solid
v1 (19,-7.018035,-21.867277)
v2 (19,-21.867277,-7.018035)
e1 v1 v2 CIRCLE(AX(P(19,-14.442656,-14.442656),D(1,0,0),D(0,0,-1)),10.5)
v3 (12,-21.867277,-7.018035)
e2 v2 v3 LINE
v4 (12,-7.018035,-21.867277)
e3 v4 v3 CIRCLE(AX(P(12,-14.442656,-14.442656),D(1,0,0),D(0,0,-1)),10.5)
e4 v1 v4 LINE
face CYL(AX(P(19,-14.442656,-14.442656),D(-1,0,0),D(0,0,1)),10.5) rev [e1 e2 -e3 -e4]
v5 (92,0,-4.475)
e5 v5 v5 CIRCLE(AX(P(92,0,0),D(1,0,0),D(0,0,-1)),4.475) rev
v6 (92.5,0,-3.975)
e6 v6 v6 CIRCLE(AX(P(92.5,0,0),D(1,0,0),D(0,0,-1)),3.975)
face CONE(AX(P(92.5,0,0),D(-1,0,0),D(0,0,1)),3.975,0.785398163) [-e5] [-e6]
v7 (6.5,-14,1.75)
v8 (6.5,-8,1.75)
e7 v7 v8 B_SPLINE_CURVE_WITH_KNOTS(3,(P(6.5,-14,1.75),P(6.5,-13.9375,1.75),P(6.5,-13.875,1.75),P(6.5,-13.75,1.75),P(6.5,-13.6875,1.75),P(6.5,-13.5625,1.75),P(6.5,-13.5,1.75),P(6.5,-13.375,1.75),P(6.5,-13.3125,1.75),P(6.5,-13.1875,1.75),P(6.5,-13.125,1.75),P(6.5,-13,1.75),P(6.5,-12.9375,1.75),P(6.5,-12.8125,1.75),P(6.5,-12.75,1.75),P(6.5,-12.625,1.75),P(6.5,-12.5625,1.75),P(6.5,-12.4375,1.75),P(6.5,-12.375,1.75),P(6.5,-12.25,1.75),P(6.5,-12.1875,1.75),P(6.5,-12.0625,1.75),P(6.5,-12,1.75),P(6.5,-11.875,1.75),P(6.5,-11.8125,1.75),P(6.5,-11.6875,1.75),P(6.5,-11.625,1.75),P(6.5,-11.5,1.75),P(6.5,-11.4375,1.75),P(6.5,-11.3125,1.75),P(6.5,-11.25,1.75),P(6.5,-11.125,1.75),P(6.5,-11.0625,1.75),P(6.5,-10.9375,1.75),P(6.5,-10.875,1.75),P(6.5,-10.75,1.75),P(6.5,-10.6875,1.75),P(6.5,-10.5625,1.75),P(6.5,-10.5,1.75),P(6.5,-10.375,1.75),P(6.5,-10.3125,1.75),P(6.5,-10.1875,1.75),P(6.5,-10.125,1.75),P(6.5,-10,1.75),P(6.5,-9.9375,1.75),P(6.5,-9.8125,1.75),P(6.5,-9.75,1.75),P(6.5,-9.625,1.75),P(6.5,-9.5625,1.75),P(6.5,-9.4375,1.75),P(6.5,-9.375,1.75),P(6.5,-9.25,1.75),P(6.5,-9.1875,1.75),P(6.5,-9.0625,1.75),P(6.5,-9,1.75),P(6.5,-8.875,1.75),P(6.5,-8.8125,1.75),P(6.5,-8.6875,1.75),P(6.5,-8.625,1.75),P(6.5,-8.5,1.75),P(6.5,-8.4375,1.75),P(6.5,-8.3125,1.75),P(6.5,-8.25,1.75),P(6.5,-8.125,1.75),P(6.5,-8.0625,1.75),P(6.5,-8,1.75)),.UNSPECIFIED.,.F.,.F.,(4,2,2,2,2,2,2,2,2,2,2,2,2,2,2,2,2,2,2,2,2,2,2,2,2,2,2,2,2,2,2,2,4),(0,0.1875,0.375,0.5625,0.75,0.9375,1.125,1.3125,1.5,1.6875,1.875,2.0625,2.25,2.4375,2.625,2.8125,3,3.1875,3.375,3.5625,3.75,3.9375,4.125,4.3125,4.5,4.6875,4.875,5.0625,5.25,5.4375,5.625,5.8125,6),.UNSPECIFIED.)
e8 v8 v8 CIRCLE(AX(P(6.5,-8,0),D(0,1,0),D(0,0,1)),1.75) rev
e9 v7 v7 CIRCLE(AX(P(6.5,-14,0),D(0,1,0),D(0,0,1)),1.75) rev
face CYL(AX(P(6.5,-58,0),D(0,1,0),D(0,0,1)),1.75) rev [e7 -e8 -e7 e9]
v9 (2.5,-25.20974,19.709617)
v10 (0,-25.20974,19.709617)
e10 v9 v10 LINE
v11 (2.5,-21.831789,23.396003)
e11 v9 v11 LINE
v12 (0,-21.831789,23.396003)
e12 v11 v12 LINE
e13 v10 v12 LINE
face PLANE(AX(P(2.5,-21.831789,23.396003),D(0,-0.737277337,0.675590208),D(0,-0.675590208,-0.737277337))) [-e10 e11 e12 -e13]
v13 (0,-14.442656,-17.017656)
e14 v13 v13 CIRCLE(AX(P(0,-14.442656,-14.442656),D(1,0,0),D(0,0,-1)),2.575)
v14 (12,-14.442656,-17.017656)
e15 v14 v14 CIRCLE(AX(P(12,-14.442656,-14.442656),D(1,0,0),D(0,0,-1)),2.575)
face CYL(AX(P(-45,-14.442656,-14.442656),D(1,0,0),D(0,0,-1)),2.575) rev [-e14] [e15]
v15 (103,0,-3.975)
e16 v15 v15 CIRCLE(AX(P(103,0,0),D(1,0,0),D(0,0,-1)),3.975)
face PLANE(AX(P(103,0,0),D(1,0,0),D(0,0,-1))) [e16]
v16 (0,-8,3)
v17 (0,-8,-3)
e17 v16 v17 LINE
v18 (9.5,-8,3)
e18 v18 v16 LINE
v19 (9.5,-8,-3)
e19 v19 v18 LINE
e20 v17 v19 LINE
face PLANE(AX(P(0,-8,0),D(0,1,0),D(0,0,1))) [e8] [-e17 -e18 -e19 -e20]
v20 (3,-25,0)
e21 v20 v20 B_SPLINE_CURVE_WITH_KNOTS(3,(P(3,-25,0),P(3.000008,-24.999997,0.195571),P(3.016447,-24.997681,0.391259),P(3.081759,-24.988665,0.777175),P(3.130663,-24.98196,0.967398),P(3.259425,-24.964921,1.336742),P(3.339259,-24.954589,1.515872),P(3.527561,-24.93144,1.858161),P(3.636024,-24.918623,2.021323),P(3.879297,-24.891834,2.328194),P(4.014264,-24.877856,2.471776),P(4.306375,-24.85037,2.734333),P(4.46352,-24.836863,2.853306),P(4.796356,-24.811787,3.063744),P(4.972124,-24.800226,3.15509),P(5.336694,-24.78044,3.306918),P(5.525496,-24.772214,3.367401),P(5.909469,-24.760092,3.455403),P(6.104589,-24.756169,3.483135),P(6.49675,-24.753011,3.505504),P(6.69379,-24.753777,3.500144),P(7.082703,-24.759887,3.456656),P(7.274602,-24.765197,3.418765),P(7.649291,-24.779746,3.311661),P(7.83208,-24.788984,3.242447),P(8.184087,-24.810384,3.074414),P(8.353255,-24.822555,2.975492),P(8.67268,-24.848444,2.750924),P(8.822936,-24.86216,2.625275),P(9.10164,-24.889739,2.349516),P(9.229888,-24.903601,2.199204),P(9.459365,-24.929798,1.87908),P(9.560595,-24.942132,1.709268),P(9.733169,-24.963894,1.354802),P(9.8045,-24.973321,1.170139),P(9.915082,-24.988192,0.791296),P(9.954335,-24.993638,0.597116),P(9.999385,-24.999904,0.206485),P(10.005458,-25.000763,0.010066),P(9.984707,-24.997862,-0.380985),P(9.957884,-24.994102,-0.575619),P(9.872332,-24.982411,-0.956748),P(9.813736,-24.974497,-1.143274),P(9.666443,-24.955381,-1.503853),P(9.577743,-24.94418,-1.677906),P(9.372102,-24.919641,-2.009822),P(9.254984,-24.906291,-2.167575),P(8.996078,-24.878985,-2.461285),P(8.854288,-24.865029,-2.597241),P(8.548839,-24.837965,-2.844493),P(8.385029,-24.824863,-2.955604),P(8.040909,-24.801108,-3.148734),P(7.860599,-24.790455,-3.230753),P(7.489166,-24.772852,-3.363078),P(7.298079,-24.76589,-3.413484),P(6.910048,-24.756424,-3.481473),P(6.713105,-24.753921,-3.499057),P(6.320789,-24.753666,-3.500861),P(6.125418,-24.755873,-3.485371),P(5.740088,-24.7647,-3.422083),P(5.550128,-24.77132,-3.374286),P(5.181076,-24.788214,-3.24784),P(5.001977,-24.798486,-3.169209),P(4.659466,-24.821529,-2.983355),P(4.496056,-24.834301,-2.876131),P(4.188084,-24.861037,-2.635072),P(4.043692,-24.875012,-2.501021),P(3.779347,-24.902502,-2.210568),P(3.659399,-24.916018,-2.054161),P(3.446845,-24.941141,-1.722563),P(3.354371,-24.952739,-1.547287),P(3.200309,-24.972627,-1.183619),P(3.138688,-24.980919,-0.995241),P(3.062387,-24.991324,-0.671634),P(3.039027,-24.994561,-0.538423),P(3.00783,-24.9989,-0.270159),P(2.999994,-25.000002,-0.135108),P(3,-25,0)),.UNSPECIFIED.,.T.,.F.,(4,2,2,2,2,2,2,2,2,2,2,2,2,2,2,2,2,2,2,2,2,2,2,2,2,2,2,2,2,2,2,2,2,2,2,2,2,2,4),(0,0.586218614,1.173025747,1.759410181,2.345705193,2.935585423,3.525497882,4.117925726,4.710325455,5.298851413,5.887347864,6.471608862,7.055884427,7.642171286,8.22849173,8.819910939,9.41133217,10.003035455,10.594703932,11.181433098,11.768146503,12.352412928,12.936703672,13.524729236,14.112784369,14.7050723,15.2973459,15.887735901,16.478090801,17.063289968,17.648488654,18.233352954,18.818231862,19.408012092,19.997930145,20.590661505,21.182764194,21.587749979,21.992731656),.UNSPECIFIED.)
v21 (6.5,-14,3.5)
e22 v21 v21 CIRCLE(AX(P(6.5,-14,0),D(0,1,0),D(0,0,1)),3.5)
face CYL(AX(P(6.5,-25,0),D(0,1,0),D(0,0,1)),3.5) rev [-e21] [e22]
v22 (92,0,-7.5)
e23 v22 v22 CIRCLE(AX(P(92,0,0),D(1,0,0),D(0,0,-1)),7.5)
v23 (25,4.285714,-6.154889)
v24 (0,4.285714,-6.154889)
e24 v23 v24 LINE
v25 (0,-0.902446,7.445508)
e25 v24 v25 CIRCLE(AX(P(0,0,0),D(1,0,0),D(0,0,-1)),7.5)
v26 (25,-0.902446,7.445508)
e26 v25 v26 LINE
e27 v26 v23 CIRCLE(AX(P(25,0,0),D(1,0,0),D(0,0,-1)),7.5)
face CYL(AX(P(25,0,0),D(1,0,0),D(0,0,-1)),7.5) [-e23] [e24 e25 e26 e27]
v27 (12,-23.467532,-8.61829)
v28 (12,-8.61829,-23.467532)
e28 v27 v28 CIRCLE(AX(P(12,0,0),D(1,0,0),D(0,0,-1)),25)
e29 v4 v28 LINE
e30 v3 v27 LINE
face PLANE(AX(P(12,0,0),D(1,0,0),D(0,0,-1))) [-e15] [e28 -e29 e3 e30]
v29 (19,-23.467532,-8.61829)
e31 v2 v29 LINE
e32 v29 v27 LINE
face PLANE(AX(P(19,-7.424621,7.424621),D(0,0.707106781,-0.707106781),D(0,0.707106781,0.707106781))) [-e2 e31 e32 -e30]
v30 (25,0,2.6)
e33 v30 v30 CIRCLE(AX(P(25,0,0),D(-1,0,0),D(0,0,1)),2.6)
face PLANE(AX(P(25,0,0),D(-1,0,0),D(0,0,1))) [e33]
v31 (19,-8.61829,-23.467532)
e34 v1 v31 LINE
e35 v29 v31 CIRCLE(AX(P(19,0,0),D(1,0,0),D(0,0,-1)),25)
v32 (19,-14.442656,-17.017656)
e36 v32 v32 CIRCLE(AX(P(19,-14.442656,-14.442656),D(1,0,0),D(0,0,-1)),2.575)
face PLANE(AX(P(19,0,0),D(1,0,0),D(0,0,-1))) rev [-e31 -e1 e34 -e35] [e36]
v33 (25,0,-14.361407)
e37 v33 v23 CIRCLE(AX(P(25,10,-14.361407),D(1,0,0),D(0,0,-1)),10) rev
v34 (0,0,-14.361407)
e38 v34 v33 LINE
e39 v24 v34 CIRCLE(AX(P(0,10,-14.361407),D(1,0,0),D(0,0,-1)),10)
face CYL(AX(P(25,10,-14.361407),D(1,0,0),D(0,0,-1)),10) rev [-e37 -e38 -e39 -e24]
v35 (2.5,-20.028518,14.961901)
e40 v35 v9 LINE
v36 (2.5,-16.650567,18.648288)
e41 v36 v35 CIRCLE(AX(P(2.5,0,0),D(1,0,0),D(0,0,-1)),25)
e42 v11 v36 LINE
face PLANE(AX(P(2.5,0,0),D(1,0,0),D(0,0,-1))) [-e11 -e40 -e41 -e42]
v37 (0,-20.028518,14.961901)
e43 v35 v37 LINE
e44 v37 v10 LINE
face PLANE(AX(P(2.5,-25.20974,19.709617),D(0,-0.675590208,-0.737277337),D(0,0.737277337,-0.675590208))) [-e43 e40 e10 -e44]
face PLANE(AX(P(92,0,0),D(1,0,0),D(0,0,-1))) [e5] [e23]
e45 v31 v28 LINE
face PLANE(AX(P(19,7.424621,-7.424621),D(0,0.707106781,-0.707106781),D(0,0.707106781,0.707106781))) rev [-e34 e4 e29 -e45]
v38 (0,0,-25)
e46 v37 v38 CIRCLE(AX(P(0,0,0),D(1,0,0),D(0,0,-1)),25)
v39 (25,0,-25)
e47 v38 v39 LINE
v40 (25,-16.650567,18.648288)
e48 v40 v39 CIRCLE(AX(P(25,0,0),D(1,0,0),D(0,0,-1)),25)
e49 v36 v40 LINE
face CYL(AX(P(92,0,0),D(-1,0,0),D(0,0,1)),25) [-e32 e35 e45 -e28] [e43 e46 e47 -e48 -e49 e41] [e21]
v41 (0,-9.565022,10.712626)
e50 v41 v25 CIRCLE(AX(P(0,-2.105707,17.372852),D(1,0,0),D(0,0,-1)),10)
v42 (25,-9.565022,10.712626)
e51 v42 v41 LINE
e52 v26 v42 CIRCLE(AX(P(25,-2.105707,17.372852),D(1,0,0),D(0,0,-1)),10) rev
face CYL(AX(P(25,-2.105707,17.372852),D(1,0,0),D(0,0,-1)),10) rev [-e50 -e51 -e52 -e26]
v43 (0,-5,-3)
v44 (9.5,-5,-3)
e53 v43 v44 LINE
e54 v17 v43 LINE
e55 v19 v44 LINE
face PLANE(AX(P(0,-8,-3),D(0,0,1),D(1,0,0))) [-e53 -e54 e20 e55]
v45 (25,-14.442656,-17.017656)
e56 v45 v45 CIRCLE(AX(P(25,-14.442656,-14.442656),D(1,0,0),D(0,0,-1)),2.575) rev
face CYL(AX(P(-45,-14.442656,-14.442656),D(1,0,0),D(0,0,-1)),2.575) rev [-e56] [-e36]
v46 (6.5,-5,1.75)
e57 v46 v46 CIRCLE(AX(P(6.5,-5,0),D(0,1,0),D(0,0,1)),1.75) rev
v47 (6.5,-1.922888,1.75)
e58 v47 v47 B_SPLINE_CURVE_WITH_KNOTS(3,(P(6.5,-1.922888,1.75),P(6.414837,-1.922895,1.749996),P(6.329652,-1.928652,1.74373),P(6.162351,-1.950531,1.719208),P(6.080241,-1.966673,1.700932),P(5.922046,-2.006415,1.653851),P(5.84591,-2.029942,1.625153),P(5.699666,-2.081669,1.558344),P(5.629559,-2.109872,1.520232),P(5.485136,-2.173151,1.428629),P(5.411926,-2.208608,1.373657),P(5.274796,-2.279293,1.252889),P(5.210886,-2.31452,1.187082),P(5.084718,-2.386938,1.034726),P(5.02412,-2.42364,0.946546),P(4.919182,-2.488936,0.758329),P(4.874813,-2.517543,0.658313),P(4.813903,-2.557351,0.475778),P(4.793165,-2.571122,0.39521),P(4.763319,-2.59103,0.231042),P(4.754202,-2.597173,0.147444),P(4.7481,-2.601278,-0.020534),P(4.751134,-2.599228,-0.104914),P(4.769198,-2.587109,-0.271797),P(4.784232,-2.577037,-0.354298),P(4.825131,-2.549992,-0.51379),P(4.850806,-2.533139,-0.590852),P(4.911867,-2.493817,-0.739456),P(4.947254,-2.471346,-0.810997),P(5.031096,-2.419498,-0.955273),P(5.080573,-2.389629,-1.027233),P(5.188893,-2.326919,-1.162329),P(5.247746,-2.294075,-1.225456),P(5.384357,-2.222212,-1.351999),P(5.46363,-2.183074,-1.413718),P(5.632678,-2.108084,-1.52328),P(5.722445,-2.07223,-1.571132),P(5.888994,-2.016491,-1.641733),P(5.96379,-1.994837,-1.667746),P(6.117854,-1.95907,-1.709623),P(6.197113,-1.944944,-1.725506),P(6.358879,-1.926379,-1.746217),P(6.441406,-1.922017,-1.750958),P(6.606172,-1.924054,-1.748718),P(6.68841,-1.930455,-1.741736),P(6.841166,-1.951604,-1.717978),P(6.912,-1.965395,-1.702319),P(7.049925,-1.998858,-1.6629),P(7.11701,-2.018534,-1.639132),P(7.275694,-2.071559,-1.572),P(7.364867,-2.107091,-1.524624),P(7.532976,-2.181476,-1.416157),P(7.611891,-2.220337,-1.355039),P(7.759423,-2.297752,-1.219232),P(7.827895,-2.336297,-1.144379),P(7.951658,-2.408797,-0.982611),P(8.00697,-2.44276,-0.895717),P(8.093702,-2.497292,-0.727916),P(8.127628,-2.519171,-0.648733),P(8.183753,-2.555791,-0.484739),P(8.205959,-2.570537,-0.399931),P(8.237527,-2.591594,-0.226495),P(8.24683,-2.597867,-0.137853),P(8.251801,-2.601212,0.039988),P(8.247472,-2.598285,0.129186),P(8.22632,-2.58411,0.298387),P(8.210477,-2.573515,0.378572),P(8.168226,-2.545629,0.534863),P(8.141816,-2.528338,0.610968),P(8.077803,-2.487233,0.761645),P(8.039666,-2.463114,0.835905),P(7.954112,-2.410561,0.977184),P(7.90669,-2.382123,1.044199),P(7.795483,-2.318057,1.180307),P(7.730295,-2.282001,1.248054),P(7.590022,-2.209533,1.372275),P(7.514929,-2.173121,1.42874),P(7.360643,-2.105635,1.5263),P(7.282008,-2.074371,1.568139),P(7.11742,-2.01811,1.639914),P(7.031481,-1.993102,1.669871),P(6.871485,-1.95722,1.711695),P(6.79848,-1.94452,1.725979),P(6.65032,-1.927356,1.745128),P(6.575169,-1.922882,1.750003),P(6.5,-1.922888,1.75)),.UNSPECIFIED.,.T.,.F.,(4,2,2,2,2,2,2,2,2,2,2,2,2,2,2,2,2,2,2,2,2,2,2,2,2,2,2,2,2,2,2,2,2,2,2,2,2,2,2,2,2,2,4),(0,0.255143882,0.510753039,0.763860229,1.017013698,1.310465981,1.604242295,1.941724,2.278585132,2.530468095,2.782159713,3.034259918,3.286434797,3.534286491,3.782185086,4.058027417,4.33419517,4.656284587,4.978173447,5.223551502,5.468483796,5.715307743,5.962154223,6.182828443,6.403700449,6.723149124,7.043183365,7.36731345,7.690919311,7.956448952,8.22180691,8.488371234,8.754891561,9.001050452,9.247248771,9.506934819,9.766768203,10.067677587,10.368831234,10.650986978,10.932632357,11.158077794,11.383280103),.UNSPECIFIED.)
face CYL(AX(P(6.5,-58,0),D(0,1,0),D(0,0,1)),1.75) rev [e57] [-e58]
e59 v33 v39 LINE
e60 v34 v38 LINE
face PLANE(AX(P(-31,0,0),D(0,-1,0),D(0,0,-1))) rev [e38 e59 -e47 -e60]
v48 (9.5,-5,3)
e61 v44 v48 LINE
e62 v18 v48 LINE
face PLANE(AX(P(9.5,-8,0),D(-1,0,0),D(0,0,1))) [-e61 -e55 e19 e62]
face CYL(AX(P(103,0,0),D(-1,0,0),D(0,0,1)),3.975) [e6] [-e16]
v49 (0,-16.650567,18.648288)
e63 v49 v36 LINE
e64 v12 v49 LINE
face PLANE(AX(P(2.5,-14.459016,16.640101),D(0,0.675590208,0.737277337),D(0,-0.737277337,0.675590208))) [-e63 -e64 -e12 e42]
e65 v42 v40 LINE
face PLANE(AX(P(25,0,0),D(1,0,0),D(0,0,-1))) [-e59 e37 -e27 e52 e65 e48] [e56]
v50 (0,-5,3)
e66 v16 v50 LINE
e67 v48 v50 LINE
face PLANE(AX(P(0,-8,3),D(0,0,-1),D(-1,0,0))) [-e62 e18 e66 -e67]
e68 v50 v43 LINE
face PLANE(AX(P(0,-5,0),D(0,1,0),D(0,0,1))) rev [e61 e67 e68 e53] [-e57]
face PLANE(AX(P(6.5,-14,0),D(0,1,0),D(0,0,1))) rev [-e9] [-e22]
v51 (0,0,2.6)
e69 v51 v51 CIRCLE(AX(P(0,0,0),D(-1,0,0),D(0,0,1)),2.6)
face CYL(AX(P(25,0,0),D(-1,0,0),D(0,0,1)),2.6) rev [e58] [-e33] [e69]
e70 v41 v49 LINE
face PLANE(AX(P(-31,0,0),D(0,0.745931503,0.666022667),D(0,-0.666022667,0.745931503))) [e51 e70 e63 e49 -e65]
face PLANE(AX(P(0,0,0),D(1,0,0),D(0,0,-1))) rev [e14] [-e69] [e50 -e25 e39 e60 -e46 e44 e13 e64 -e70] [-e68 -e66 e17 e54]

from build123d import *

# Parameters (mm, degrees)
SKETCH1_R                = 25
BOSS_EXTRUDE1_DEPTH      = 92
CUT_EXTRUDE1_START       = 12
CUT_EXTRUDE1_DEPTH       = 7
CUT_EXTRUDE2_START       = 48
CUT_EXTRUDE2_DEPTH       = 7
CUT_EXTRUDE3_START       = 24
CUT_EXTRUDE3_DEPTH       = 7
CUT_EXTRUDE7_START       = 60
CUT_EXTRUDE7_DEPTH       = 7
CUT_EXTRUDE8_START       = 36
CUT_EXTRUDE8_DEPTH       = 7
CUT_EXTRUDE9_START       = 72
CUT_EXTRUDE9_DEPTH       = 7
CUT_EXTRUDE10_DEPTH      = 8
CUT_EXTRUDE10_DEPTH_BACK = 64
CUT_EXTRUDE10_START      = 19
SKETCH1_28_R             = 2.575
CUT_EXTRUDE11_DEPTH      = 8
CUT_EXTRUDE11_DEPTH_BACK = 73
CUT_EXTRUDE11_START      = 31
SKETCH1_29_R             = 2.575
CUT_EXTRUDE12_DEPTH      = 8
CUT_EXTRUDE12_DEPTH_BACK = 183
CUT_EXTRUDE12_START      = 43
SKETCH1_30_R             = 2.575
CUT_EXTRUDE13_DEPTH      = 74
CUT_EXTRUDE13_DEPTH_BACK = 8
CUT_EXTRUDE13_START      = 48
SKETCH1_31_R             = 2.575
CUT_EXTRUDE14_DEPTH      = 87
CUT_EXTRUDE14_DEPTH_BACK = 8
CUT_EXTRUDE14_START      = 60
SKETCH1_32_R             = 2.575
CUT_EXTRUDE15_DEPTH      = 124
CUT_EXTRUDE15_DEPTH_BACK = 8
CUT_EXTRUDE15_START      = 72
SKETCH1_33_R             = 2.575
SKETCH2_R                = 2.6
CUT_EXTRUDE16_DEPTH      = 25
SKETCH4_R                = 3.975
BOSS_EXTRUDE2_DEPTH      = 11
SKETCH5_R                = 1.75
CUT_EXTRUDE17_DEPTH      = 58
CUT_EXTRUDE18_START      = -5
SKETCH5_3_R              = 1.75
CUT_EXTRUDE18_DEPTH      = 3
CUT_EXTRUDE19_START      = -14
SKETCH5_4_R              = 3.5
CUT_EXTRUDE19_DEPTH      = 95.89903586
CHAMFER1_SIZE            = 0.5
BOSS_EXTRUDE3_DEPTH      = 2.5
CUT_EXTRUDE20_START      = -67
SKETCH7_R                = 2.575
CUT_EXTRUDE20_DEPTH      = 67
CUT_EXTRUDE22_START      = -123
CUT_EXTRUDE22_DEPTH      = 123
FILLET1_R                = 10


with BuildPart() as part:
    # Sketch1 → Boss-Extrude1 (new body)
    with BuildSketch(Plane(origin=(0, 0, 0), x_dir=(0, 0, -1), z_dir=(1, 0, 0))):
        Circle(SKETCH1_R)
    extrude(amount=BOSS_EXTRUDE1_DEPTH)

    # Sketch1<3> → Cut-Extrude1 (cut)
    with BuildSketch(Plane(origin=(0, 0, 0), x_dir=(0, 0, -1), z_dir=(1, 0, 0)).offset(CUT_EXTRUDE1_START)):
        with BuildLine():
            ThreePointArc((8.618290005, -23.46753241), (17.67766953, -17.67766953), (23.46753241, -8.618290005))
            Line((23.46753241, -8.618290005), (21.867277208, -7.018034803))
            ThreePointArc((21.867277208, -7.018034803), (7.018034803, -7.018034803), (7.018034803, -21.867277208))
            Line((7.018034803, -21.867277208), (8.618290005, -23.46753241))
        make_face()
    extrude(amount=CUT_EXTRUDE1_DEPTH, mode=Mode.SUBTRACT)

    # Sketch1<8> → Cut-Extrude2 (cut)
    with BuildSketch(Plane(origin=(0, 0, 0), x_dir=(0, 0, -1), z_dir=(1, 0, 0)).offset(CUT_EXTRUDE2_START)):
        with BuildLine():
            ThreePointArc((20.425, 10.5), (9.925, 0), (20.425, -10.5))
            Line((20.425, -10.5), (22.688102609, -10.5))
            ThreePointArc((22.688102609, -10.5), (25, 0), (22.688102609, 10.5))
            Line((22.688102609, 10.5), (20.425, 10.5))
        make_face()
    extrude(amount=CUT_EXTRUDE2_DEPTH, mode=Mode.SUBTRACT)

    # Sketch1<9> → Cut-Extrude3 (cut)
    with BuildSketch(Plane(origin=(0, 0, 0), x_dir=(0, 0, -1), z_dir=(1, 0, 0)).offset(CUT_EXTRUDE3_START)):
        with BuildLine():
            ThreePointArc((7.018034803, 21.867277208), (7.018034803, 7.018034803), (21.867277208, 7.018034803))
            Line((21.867277208, 7.018034803), (23.46753241, 8.618290005))
            ThreePointArc((23.46753241, 8.618290005), (17.67766953, 17.67766953), (8.618290005, 23.46753241))
            Line((8.618290005, 23.46753241), (7.018034803, 21.867277208))
        make_face()
    extrude(amount=CUT_EXTRUDE3_DEPTH, mode=Mode.SUBTRACT)

    # Sketch1<10> → Cut-Extrude7 (cut)
    with BuildSketch(Plane(origin=(0, 0, 0), x_dir=(0, 0, -1), z_dir=(1, 0, 0)).offset(CUT_EXTRUDE7_START)):
        with BuildLine():
            Line((-10.5, 22.688102609), (-10.5, 20.425))
            ThreePointArc((-10.5, 20.425), (0, 9.925), (10.5, 20.425))
            Line((10.5, 20.425), (10.5, 22.688102609))
            ThreePointArc((10.5, 22.688102609), (0, 25), (-10.5, 22.688102609))
        make_face()
    extrude(amount=CUT_EXTRUDE7_DEPTH, mode=Mode.SUBTRACT)

    # Sketch1<11> → Cut-Extrude8 (cut)
    with BuildSketch(Plane(origin=(0, 0, 0), x_dir=(0, 0, -1), z_dir=(1, 0, 0)).offset(CUT_EXTRUDE8_START)):
        with BuildLine():
            Line((-23.46753241, 8.618290005), (-21.867277208, 7.018034803))
            ThreePointArc((-21.867277208, 7.018034803), (-7.018034803, 7.018034803), (-7.018034803, 21.867277208))
            Line((-7.018034803, 21.867277208), (-8.618290005, 23.46753241))
            ThreePointArc((-8.618290005, 23.46753241), (-17.67766953, 17.67766953), (-23.46753241, 8.618290005))
        make_face()
    extrude(amount=CUT_EXTRUDE8_DEPTH, mode=Mode.SUBTRACT)

    # Sketch1<12> → Cut-Extrude9 (cut)
    with BuildSketch(Plane(origin=(0, 0, 0), x_dir=(0, 0, -1), z_dir=(1, 0, 0)).offset(CUT_EXTRUDE9_START)):
        with BuildLine():
            Line((-22.688102609, -10.5), (-20.425, -10.5))
            ThreePointArc((-20.425, -10.5), (-9.925, 0), (-20.425, 10.5))
            Line((-20.425, 10.5), (-22.688102609, 10.5))
            ThreePointArc((-22.688102609, 10.5), (-25, 0), (-22.688102609, -10.5))
        make_face()
    extrude(amount=CUT_EXTRUDE9_DEPTH, mode=Mode.SUBTRACT)

    # Sketch1<28> → Cut-Extrude10 (cut, two sides: drawn at the far end of the back side and taken through both)
    with BuildSketch(Plane(origin=(0, 0, 0), x_dir=(0, 0, -1), z_dir=(1, 0, 0)).offset(CUT_EXTRUDE10_START - CUT_EXTRUDE10_DEPTH_BACK)):
        with Locations((14.442656006, -14.442656006)):
            Circle(SKETCH1_28_R)
    extrude(amount=CUT_EXTRUDE10_DEPTH + CUT_EXTRUDE10_DEPTH_BACK, mode=Mode.SUBTRACT)

    # Sketch1<29> → Cut-Extrude11 (cut, two sides: drawn at the far end of the back side and taken through both)
    with BuildSketch(Plane(origin=(0, 0, 0), x_dir=(0, 0, -1), z_dir=(1, 0, 0)).offset(CUT_EXTRUDE11_START - CUT_EXTRUDE11_DEPTH_BACK)):
        with Locations((14.442656006, 14.442656006)):
            Circle(SKETCH1_29_R)
    extrude(amount=CUT_EXTRUDE11_DEPTH + CUT_EXTRUDE11_DEPTH_BACK, mode=Mode.SUBTRACT)

    # Sketch1<30> → Cut-Extrude12 (cut, two sides: drawn at the far end of the back side and taken through both)
    with BuildSketch(Plane(origin=(0, 0, 0), x_dir=(0, 0, -1), z_dir=(1, 0, 0)).offset(CUT_EXTRUDE12_START - CUT_EXTRUDE12_DEPTH_BACK)):
        with Locations((-14.442656006, 14.442656006)):
            Circle(SKETCH1_30_R)
    extrude(amount=CUT_EXTRUDE12_DEPTH + CUT_EXTRUDE12_DEPTH_BACK, mode=Mode.SUBTRACT)

    # Sketch1<31> → Cut-Extrude13 (cut, two sides: drawn at the far end of the back side and taken through both)
    with BuildSketch(Plane(origin=(0, 0, 0), x_dir=(0, 0, -1), z_dir=(1, 0, 0)).offset(CUT_EXTRUDE13_START - CUT_EXTRUDE13_DEPTH_BACK)):
        with Locations((20.425, 0)):
            Circle(SKETCH1_31_R)
    extrude(amount=CUT_EXTRUDE13_DEPTH + CUT_EXTRUDE13_DEPTH_BACK, mode=Mode.SUBTRACT)

    # Sketch1<32> → Cut-Extrude14 (cut, two sides: drawn at the far end of the back side and taken through both)
    with BuildSketch(Plane(origin=(0, 0, 0), x_dir=(0, 0, -1), z_dir=(1, 0, 0)).offset(CUT_EXTRUDE14_START - CUT_EXTRUDE14_DEPTH_BACK)):
        with Locations((0, 20.425)):
            Circle(SKETCH1_32_R)
    extrude(amount=CUT_EXTRUDE14_DEPTH + CUT_EXTRUDE14_DEPTH_BACK, mode=Mode.SUBTRACT)

    # Sketch1<33> → Cut-Extrude15 (cut, two sides: drawn at the far end of the back side and taken through both)
    with BuildSketch(Plane(origin=(0, 0, 0), x_dir=(0, 0, -1), z_dir=(1, 0, 0)).offset(CUT_EXTRUDE15_START - CUT_EXTRUDE15_DEPTH_BACK)):
        with Locations((-20.425, 0)):
            Circle(SKETCH1_33_R)
    extrude(amount=CUT_EXTRUDE15_DEPTH + CUT_EXTRUDE15_DEPTH_BACK, mode=Mode.SUBTRACT)

    # Sketch2 → Cut-Extrude16 (cut)
    with BuildSketch(Plane.ZY):
        Circle(SKETCH2_R)
    extrude(amount=-CUT_EXTRUDE16_DEPTH, mode=Mode.SUBTRACT)

    # Sketch4 → Boss-Extrude2 (add)
    with BuildSketch(Plane(origin=(92, 0, 0), x_dir=(0, 0, -1), z_dir=(1, 0, 0))):
        Circle(SKETCH4_R)
    extrude(amount=BOSS_EXTRUDE2_DEPTH)

    # Sketch5 → Cut-Extrude17 (cut)
    with BuildSketch(Plane(origin=(0, 0, 0), x_dir=(1, 0, 0), z_dir=(0, 1, 0))):
        with Locations(Location((6.5, 0, 0), (0, 0, 270))):
            Circle(SKETCH5_R)
    extrude(amount=-CUT_EXTRUDE17_DEPTH, mode=Mode.SUBTRACT)

    # Sketch5<3> → Cut-Extrude18 (cut)
    # profile 1 of 5: a face of its own
    with BuildSketch(Plane(origin=(0, 0, 0), x_dir=(1, 0, 0), z_dir=(0, 1, 0)).offset(CUT_EXTRUDE18_START)):
        with BuildLine():
            Line((9.5, 1.802775638), (9.5, 3))
            Line((9.5, 3), (8.302775638, 3))
            ThreePointArc((8.302775638, 3), (8.974873734, 2.474873734), (9.5, 1.802775638))
        make_face()
    # profile 2 of 5: a face of its own
    with BuildSketch(Plane(origin=(0, 0, 0), x_dir=(1, 0, 0), z_dir=(0, 1, 0)).offset(CUT_EXTRUDE18_START)):
        with BuildLine():
            Line((8.302775638, 3), (4.697224362, 3))
            ThreePointArc((4.697224362, 3), (3, 0), (4.697224362, -3))
            Line((4.697224362, -3), (8.302775638, -3))
            ThreePointArc((8.302775638, -3), (8.974873734, -2.474873734), (9.5, -1.802775638))
            Line((9.5, -1.802775638), (9.5, 1.802775638))
            ThreePointArc((9.5, 1.802775638), (8.974873734, 2.474873734), (8.302775638, 3))
        make_face()
        with Locations(Location((6.5, 0, 0), (0, 0, 270))):
            Circle(SKETCH5_3_R, mode=Mode.SUBTRACT)
    # profile 3 of 5: a face of its own
    with BuildSketch(Plane(origin=(0, 0, 0), x_dir=(1, 0, 0), z_dir=(0, 1, 0)).offset(CUT_EXTRUDE18_START)):
        with BuildLine():
            Line((8.302775638, -3), (9.5, -3))
            Line((9.5, -3), (9.5, -1.802775638))
            ThreePointArc((9.5, -1.802775638), (8.974873734, -2.474873734), (8.302775638, -3))
        make_face()
    # profile 4 of 5: a face of its own
    with BuildSketch(Plane(origin=(0, 0, 0), x_dir=(1, 0, 0), z_dir=(0, 1, 0)).offset(CUT_EXTRUDE18_START)):
        with BuildLine():
            Line((4.697224362, 3), (0, 3))
            Line((0, 3), (0, -3))
            Line((0, -3), (4.697224362, -3))
            ThreePointArc((4.697224362, -3), (3, 0), (4.697224362, 3))
        make_face()
    # profile 5 of 5: a face of its own
    with BuildSketch(Plane(origin=(0, 0, 0), x_dir=(1, 0, 0), z_dir=(0, 1, 0)).offset(CUT_EXTRUDE18_START)):
        with Locations(Location((6.5, 0, 0), (0, 0, 270))):
            Circle(SKETCH5_3_R)
    extrude(amount=-CUT_EXTRUDE18_DEPTH, mode=Mode.SUBTRACT)

    # Sketch5<4> → Cut-Extrude19 (cut, through all)
    with BuildSketch(Plane(origin=(0, 0, 0), x_dir=(1, 0, 0), z_dir=(0, 1, 0)).offset(CUT_EXTRUDE19_START)):
        with Locations(Location((6.5, 0, 0), (0, 0, 270))):
            Circle(SKETCH5_4_R)
    extrude(amount=-CUT_EXTRUDE19_DEPTH, mode=Mode.SUBTRACT)

    # Chamfer1
    chamfer1_edges = [part.edges().sort_by_distance(p)[0] for p in [
        (92, 0, 3.975),
    ]]
    chamfer(chamfer1_edges, length=CHAMFER1_SIZE)

    # Sketch6 → Boss-Extrude3 (add)
    with BuildSketch(Plane.ZY):
        Polygon((23.3960034, -21.83178932), (19.709616716, -25.209740358), (12.95371464, -17.836966989), (16.640101324, -14.459015951), align=None)
    extrude(amount=-BOSS_EXTRUDE3_DEPTH)

    # Sketch7 → Cut-Extrude20 (cut)
    # profile 1 of 8: a face of its own
    with BuildSketch(Plane(origin=(92, 0, 0), x_dir=(0, 0, -1), z_dir=(1, 0, 0)).offset(CUT_EXTRUDE20_START)):
        with BuildLine():
            ThreePointArc((7.5, 0), (2.673139817, -7.007447718), (-5.594486272, -4.995170003))
            Line((-5.594486272, -4.995170003), (-18.648287572, -16.650566676))
            ThreePointArc((-18.648287572, -16.650566676), (8.910466057, -23.35815906), (25, 0))
            Line((25, 0), (23, 0))
            ThreePointArc((23, 0), (20.425, -2.575), (17.85, 0))
            Line((17.85, 0), (7.5, 0))
        make_face()
    # profile 2 of 8: a face of its own
    with BuildSketch(Plane(origin=(92, 0, 0), x_dir=(0, 0, -1), z_dir=(1, 0, 0)).offset(CUT_EXTRUDE20_START)):
        with BuildLine():
            Line((-18.648287572, -16.650566676), (-5.594486272, -4.995170003))
            ThreePointArc((-5.594486272, -4.995170003), (-2.673139817, 7.007447718), (7.5, 0))
            Line((7.5, 0), (17.85, 0))
            ThreePointArc((17.85, 0), (20.425, 2.575), (23, 0))
            Line((23, 0), (25, 0))
            ThreePointArc((25, 0), (-8.910466057, 23.35815906), (-18.648287572, -16.650566676))
        make_face()
        with Locations((-20.425, 0)):
            Circle(SKETCH7_R, mode=Mode.SUBTRACT)
        with Locations((0, 20.425)):
            Circle(SKETCH7_R, mode=Mode.SUBTRACT)
    # profile 3 of 8: a face of its own
    with BuildSketch(Plane(origin=(92, 0, 0), x_dir=(0, 0, -1), z_dir=(1, 0, 0)).offset(CUT_EXTRUDE20_START)):
        with Locations((-20.425, 0)):
            Circle(SKETCH7_R)
    # profile 4 of 8: a face of its own
    with BuildSketch(Plane(origin=(92, 0, 0), x_dir=(0, 0, -1), z_dir=(1, 0, 0)).offset(CUT_EXTRUDE20_START)):
        with Locations((0, 20.425)):
            Circle(SKETCH7_R)
    # profile 5 of 8: a face of its own
    with BuildSketch(Plane(origin=(92, 0, 0), x_dir=(0, 0, -1), z_dir=(1, 0, 0)).offset(CUT_EXTRUDE20_START)):
        with BuildLine():
            ThreePointArc((23, 0), (20.425, 2.575), (17.85, 0))
            Line((17.85, 0), (23, 0))
        make_face()
    # profile 6 of 8: a face of its own
    with BuildSketch(Plane(origin=(92, 0, 0), x_dir=(0, 0, -1), z_dir=(1, 0, 0)).offset(CUT_EXTRUDE20_START)):
        with BuildLine():
            Line((23, 0), (17.85, 0))
            ThreePointArc((17.85, 0), (20.425, -2.575), (23, 0))
        make_face()
    # profile 7 of 8: a face of its own
    with BuildSketch(Plane(origin=(92, 0, 0), x_dir=(0, 0, -1), z_dir=(1, 0, 0)).offset(CUT_EXTRUDE20_START)):
        with BuildLine():
            ThreePointArc((23, 0), (20.425, 2.575), (17.85, 0))
            Line((17.85, 0), (23, 0))
        make_face()
    # profile 8 of 8: a face of its own
    with BuildSketch(Plane(origin=(92, 0, 0), x_dir=(0, 0, -1), z_dir=(1, 0, 0)).offset(CUT_EXTRUDE20_START)):
        with BuildLine():
            Line((23, 0), (17.85, 0))
            ThreePointArc((17.85, 0), (20.425, -2.575), (23, 0))
        make_face()
    extrude(amount=CUT_EXTRUDE20_DEPTH, mode=Mode.SUBTRACT)

    # Sketch7<6> → Cut-Extrude22 (cut)
    with BuildSketch(Plane(origin=(92, 0, 0), x_dir=(0, 0, -1), z_dir=(1, 0, 0)).offset(CUT_EXTRUDE22_START)):
        with BuildLine():
            Line((-18.648287572, -16.650566676), (-5.594486272, -4.995170003))
            ThreePointArc((-5.594486272, -4.995170003), (-2.673139817, 7.007447718), (7.5, 0))
            Line((7.5, 0), (25, 0))
            ThreePointArc((25, 0), (-8.910466057, 23.35815906), (-18.648287572, -16.650566676))
        make_face()
    extrude(amount=CUT_EXTRUDE22_DEPTH, mode=Mode.SUBTRACT)

    # Fillet1
    # the kernel refuses this fillet: 10 mm, written as the material it adds along each edge
    with BuildSketch(Plane(origin=(0, 0, -7.5), x_dir=(0, 0.9541100058820106, 0.29945633517397796), z_dir=(1, 0, 0))) as fillet1_piece_1:
        with BuildLine():
            CenterArc((7.486408379, -9.541100059), FILLET1_R, 107.42495229, 55.150095421)
            Line((-2.054691679, -6.546536707), (0, 0))
            ThreePointArc((0, 0), (2.245922514, -0.344174956), (4.491845028, 0))
        make_face()
    extrude(amount=25)
    with BuildSketch(Plane(origin=(0, -4.995170003, 5.594486272), x_dir=(0, 0.9111454176217525, 0.4120849766090511), z_dir=(1, 0, 0))) as fillet1_piece_2:
        with BuildLine():
            CenterArc((7.486408379, 9.541100059), FILLET1_R, 197.42495229, 55.150095421)
            Line((-2.054691679, 6.546536707), (0, 0))
            ThreePointArc((0, 0), (2.245922514, 0.344174956), (4.491845028, 0))
        make_face()
    extrude(amount=25)


solid = part.part
